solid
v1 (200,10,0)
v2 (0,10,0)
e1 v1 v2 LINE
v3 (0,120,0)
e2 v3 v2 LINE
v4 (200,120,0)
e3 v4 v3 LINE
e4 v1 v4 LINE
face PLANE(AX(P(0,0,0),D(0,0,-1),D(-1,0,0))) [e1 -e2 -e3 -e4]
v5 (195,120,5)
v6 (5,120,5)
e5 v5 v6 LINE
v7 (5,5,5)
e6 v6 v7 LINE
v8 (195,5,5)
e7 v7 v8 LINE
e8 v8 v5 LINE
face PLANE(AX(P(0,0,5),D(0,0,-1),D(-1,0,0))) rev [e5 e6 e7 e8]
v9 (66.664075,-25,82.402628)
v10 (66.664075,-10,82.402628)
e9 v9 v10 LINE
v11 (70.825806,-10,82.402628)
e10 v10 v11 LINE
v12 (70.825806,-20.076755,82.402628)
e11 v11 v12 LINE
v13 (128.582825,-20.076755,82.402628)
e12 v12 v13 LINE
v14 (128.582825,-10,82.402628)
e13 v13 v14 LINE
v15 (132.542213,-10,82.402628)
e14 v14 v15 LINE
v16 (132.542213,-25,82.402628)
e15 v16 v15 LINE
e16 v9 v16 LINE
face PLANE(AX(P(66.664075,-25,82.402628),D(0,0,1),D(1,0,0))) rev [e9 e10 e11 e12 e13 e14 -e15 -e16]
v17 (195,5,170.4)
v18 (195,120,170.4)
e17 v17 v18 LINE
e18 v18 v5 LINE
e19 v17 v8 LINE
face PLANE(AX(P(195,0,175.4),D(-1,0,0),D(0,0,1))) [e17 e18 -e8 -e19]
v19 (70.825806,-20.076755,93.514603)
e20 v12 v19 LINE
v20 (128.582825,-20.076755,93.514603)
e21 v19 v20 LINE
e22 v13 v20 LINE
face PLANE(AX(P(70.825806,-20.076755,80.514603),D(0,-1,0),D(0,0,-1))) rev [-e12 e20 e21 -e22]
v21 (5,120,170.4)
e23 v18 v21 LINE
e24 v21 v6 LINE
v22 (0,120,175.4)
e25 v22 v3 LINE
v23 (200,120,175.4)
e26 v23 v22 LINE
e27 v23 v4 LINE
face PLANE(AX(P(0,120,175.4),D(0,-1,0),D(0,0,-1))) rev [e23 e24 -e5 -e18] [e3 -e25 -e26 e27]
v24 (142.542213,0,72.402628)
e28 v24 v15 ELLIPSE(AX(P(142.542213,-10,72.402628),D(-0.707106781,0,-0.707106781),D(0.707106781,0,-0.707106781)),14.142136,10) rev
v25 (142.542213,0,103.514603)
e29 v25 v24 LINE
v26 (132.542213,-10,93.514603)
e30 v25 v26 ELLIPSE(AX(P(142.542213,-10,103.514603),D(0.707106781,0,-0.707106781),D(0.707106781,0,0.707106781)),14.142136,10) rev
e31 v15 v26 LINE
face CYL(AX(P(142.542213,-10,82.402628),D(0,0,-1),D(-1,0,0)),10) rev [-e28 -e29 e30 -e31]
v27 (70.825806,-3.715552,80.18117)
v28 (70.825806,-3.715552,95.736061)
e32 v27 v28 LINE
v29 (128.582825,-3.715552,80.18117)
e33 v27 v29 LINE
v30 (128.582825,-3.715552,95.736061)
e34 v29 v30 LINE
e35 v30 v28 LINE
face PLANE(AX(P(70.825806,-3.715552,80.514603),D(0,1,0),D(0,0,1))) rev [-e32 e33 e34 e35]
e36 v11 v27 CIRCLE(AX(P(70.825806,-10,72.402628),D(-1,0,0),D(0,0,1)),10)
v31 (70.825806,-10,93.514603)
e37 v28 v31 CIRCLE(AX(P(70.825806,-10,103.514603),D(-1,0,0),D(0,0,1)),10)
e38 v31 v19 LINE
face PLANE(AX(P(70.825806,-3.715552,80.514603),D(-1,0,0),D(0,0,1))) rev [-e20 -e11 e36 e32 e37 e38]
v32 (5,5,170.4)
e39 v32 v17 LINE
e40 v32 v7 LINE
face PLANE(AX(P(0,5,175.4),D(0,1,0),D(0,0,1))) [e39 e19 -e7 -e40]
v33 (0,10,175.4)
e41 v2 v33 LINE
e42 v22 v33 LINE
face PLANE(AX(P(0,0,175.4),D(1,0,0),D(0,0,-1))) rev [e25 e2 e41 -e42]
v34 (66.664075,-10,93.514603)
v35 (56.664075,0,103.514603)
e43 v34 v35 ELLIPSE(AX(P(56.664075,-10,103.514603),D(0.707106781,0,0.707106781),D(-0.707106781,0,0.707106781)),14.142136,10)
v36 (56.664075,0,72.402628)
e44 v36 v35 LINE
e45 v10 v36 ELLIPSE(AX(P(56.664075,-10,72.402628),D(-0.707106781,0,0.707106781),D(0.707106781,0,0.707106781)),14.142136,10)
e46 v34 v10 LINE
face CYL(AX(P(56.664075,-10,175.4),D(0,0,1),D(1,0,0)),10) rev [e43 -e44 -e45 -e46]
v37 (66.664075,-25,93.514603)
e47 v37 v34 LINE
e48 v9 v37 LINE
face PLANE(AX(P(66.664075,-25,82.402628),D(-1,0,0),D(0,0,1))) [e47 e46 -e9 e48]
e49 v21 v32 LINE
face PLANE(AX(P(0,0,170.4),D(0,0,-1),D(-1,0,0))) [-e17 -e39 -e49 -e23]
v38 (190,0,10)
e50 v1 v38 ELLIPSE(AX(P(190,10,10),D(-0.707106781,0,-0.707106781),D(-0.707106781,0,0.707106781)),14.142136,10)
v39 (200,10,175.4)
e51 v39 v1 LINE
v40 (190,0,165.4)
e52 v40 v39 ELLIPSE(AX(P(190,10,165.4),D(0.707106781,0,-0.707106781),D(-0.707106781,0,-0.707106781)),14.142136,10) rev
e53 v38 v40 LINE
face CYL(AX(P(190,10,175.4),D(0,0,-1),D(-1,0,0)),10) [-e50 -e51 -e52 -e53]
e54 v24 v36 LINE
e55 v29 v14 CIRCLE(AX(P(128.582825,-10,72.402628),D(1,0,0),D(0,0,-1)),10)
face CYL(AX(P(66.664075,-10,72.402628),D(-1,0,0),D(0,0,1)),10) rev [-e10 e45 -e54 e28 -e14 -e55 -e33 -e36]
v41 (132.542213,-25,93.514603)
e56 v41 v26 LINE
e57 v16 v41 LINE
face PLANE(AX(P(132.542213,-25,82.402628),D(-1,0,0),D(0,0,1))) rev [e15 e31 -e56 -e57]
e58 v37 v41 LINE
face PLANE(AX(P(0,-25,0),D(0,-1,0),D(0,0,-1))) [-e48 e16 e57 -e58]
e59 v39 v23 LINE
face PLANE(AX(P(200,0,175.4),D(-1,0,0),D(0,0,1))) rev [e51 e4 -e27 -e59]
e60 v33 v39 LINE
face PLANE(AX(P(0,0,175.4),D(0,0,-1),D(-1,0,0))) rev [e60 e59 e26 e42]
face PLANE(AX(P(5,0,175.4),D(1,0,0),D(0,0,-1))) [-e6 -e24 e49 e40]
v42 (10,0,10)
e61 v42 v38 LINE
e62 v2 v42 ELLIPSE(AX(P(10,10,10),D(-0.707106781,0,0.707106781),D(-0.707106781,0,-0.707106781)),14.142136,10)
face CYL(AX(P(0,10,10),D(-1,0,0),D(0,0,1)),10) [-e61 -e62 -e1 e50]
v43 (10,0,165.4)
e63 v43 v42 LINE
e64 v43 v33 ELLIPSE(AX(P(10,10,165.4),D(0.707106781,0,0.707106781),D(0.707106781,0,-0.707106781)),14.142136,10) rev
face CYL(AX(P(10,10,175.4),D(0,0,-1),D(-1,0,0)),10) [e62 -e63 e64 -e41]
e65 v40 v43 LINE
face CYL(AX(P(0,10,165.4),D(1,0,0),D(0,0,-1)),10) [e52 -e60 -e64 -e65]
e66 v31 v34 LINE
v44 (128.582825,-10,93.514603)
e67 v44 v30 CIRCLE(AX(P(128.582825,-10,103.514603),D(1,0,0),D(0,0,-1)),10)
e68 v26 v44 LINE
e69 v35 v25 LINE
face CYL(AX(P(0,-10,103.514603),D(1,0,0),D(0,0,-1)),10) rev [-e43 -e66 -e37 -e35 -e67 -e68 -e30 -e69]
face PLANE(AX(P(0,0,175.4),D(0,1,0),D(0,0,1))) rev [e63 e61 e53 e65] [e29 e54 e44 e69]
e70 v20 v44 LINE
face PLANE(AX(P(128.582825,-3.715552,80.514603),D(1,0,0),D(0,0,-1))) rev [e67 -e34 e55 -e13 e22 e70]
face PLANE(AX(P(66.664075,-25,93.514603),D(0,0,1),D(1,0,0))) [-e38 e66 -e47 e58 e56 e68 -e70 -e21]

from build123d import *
from build123d.topology import SkipClean

# Parameters (mm, degrees)
SKETCH2_W           = 200
SKETCH2_H           = 120
BOSS_EXTRUDE1_DEPTH = 175.4
SHELL1_T            = -5
SKETCH3_W           = 65.878137889
SKETCH3_H           = 11.111975066
BOSS_EXTRUDE2_DEPTH = 25
SKETCH4_W           = 57.75701827
SKETCH4_H           = 16.361203127
CUT_EXTRUDE1_DEPTH  = 13
FILLET1_START       = 82.402628098
FILLET1_DEPTH       = 11.111975066
FILLET1_START_2     = -1
FILLET1_2_DEPTH     = 202
FILLET1_START_3     = 56.664074803
FILLET1_3_DEPTH     = 85.878137889
FILLET1_START_4     = 58.185895168
FILLET1_4_DEPTH     = 12.639911303
FILLET1_START_5     = 128.582824741
FILLET1_5_DEPTH     = 12.437567587
FILLET1_6_DEPTH     = 177


with BuildPart() as part:
    # Sketch2 → Boss-Extrude1 (new body)
    with BuildSketch(Plane.XY):
        with Locations((100, 60)):
            Rectangle(SKETCH2_W, SKETCH2_H)
    extrude(amount=BOSS_EXTRUDE1_DEPTH)

    # Shell1
    shell1_openings = [part.faces().sort_by_distance(p)[0] for p in [
        (100, 120, 87.7),
    ]]
    offset(amount=SHELL1_T, openings=shell1_openings, kind=Kind.INTERSECTION)

    # Sketch3 → Boss-Extrude2 (add)
    with BuildSketch(Plane.XZ):
        with Locations((99.603143748, 87.958615631)):
            Rectangle(SKETCH3_W, SKETCH3_H)
    extrude(amount=BOSS_EXTRUDE2_DEPTH)

    # Sketch4 → Cut-Extrude1 (cut)
    with BuildSketch(Plane.XY.offset(93.514603164)):
        with Locations((99.704315606, -11.896153919)):
            Rectangle(SKETCH4_W, SKETCH4_H)
    extrude(amount=-CUT_EXTRUDE1_DEPTH, mode=Mode.SUBTRACT)

    # Fillet1: read off the stored shape, not the designer's step
    # Fillet1 outline → Fillet1 (add)
    with BuildSketch(Plane.XY.offset(FILLET1_START)):
        with BuildLine():
            Line((142.542212692, 0), (132.542212692, 0))
            Line((132.542212692, 0), (132.542212692, -10))
            ThreePointArc((132.542212692, -10), (135.47114488, -2.928932188), (142.542212692, 0))
        make_face()
        with BuildLine():
            ThreePointArc((56.664074803, 0), (63.735142615, -2.928932188), (66.664074803, -10))
            Line((66.664074803, -10), (66.664074803, 0))
            Line((66.664074803, 0), (56.664074803, 0))
        make_face()
    extrude(amount=FILLET1_DEPTH)

    # Fillet1 2 outline → Fillet1 2 (cut)
    with BuildSketch(Plane.YZ.offset(FILLET1_START_2)):
        with BuildLine():
            Line((0, 175.4), (0, 165.4))
            ThreePointArc((0, 165.4), (2.928932188, 172.471067812), (10, 175.4))
            Line((10, 175.4), (0, 175.4))
        make_face()
        with BuildLine():
            ThreePointArc((10, 0), (2.928932188, 2.928932188), (0, 10))
            Line((0, 10), (0, 0))
            Line((0, 0), (10, 0))
        make_face()
    extrude(amount=FILLET1_2_DEPTH, mode=Mode.SUBTRACT)

    # Fillet1 3 outline → Fillet1 3 (add)
    with BuildSketch(Plane.YZ.offset(FILLET1_START_3)):
        with BuildLine():
            Line((-3.715552355, 82.402628098), (-3.715552355, 80.181170236))
            ThreePointArc((-3.715552355, 80.181170236), (-0.976572811, 76.712820875), (0, 72.402628098))
            Line((0, 72.402628098), (0, 82.402628098))
            Line((0, 82.402628098), (-3.715552355, 82.402628098))
        make_face()
        with BuildLine():
            Line((-3.715552355, 95.736061025), (-3.715552355, 93.514603164))
            Line((-3.715552355, 93.514603164), (0, 93.514603164))
            Line((0, 93.514603164), (0, 103.514603164))
            ThreePointArc((0, 103.514603164), (-0.976572812, 99.204410387), (-3.715552355, 95.736061025))
        make_face()
    extrude(amount=FILLET1_3_DEPTH)

    # Fillet1 4 outline → Fillet1 4 (add)
    with BuildSketch(Plane.YZ.offset(FILLET1_START_4)):
        with BuildLine():
            ThreePointArc((-10, 82.402628098), (-6.667239986, 81.830921193), (-3.715552355, 80.181170236))
            Line((-3.715552355, 80.181170236), (-3.715552355, 82.402628098))
            Line((-3.715552355, 82.402628098), (-10, 82.402628098))
        make_face()
        with BuildLine():
            Line((-10, 93.514603164), (-3.715552355, 93.514603164))
            Line((-3.715552355, 93.514603164), (-3.715552355, 95.736061025))
            ThreePointArc((-3.715552355, 95.736061025), (-6.667239987, 94.086310068), (-10, 93.514603164))
        make_face()
    extrude(amount=FILLET1_4_DEPTH)

    # Fillet1 5 outline → Fillet1 5 (add)
    with BuildSketch(Plane.YZ.offset(FILLET1_START_5)):
        with BuildLine():
            ThreePointArc((-10, 82.402628098), (-6.667239986, 81.830921193), (-3.715552355, 80.181170236))
            Line((-3.715552355, 80.181170236), (-3.715552355, 82.402628098))
            Line((-3.715552355, 82.402628098), (-10, 82.402628098))
        make_face()
        with BuildLine():
            Line((-10, 93.514603164), (-3.715552355, 93.514603164))
            Line((-3.715552355, 93.514603164), (-3.715552355, 95.736061025))
            ThreePointArc((-3.715552355, 95.736061025), (-6.667239987, 94.086310068), (-10, 93.514603164))
        make_face()
    extrude(amount=FILLET1_5_DEPTH)

    # Fillet1 6 outline → Fillet1 6 (cut)
    with SkipClean():  # the faces are left unmerged after this step: merging them gives an invalid solid
        with BuildSketch(Plane.XY.offset(FILLET1_START_2)):
            with BuildLine():
                Line((200, 12), (200, 10))
                ThreePointArc((200, 10), (197.071067812, 2.928932188), (190, 0))
                Line((190, 0), (142.542212692, 0))
                ThreePointArc((142.542212692, 0), (135.47114488, -2.928932188), (132.542212692, -10))
                Line((132.542212692, -10), (132.542212692, -11))
                Line((132.542212692, -11), (201, -11))
                Line((201, -11), (201, 12))
                Line((201, 12), (200, 12))
            make_face()
            with BuildLine():
                Line((0, 10), (0, 12))
                Line((0, 12), (-1, 12))
                Line((-1, 12), (-1, -11))
                Line((-1, -11), (66.664074803, -11))
                Line((66.664074803, -11), (66.664074803, -10))
                ThreePointArc((66.664074803, -10), (63.735142615, -2.928932188), (56.664074803, 0))
                Line((56.664074803, 0), (10, 0))
                ThreePointArc((10, 0), (2.928932188, 2.928932188), (0, 10))
            make_face()
        extrude(amount=FILLET1_6_DEPTH, mode=Mode.SUBTRACT)


solid = part.part
